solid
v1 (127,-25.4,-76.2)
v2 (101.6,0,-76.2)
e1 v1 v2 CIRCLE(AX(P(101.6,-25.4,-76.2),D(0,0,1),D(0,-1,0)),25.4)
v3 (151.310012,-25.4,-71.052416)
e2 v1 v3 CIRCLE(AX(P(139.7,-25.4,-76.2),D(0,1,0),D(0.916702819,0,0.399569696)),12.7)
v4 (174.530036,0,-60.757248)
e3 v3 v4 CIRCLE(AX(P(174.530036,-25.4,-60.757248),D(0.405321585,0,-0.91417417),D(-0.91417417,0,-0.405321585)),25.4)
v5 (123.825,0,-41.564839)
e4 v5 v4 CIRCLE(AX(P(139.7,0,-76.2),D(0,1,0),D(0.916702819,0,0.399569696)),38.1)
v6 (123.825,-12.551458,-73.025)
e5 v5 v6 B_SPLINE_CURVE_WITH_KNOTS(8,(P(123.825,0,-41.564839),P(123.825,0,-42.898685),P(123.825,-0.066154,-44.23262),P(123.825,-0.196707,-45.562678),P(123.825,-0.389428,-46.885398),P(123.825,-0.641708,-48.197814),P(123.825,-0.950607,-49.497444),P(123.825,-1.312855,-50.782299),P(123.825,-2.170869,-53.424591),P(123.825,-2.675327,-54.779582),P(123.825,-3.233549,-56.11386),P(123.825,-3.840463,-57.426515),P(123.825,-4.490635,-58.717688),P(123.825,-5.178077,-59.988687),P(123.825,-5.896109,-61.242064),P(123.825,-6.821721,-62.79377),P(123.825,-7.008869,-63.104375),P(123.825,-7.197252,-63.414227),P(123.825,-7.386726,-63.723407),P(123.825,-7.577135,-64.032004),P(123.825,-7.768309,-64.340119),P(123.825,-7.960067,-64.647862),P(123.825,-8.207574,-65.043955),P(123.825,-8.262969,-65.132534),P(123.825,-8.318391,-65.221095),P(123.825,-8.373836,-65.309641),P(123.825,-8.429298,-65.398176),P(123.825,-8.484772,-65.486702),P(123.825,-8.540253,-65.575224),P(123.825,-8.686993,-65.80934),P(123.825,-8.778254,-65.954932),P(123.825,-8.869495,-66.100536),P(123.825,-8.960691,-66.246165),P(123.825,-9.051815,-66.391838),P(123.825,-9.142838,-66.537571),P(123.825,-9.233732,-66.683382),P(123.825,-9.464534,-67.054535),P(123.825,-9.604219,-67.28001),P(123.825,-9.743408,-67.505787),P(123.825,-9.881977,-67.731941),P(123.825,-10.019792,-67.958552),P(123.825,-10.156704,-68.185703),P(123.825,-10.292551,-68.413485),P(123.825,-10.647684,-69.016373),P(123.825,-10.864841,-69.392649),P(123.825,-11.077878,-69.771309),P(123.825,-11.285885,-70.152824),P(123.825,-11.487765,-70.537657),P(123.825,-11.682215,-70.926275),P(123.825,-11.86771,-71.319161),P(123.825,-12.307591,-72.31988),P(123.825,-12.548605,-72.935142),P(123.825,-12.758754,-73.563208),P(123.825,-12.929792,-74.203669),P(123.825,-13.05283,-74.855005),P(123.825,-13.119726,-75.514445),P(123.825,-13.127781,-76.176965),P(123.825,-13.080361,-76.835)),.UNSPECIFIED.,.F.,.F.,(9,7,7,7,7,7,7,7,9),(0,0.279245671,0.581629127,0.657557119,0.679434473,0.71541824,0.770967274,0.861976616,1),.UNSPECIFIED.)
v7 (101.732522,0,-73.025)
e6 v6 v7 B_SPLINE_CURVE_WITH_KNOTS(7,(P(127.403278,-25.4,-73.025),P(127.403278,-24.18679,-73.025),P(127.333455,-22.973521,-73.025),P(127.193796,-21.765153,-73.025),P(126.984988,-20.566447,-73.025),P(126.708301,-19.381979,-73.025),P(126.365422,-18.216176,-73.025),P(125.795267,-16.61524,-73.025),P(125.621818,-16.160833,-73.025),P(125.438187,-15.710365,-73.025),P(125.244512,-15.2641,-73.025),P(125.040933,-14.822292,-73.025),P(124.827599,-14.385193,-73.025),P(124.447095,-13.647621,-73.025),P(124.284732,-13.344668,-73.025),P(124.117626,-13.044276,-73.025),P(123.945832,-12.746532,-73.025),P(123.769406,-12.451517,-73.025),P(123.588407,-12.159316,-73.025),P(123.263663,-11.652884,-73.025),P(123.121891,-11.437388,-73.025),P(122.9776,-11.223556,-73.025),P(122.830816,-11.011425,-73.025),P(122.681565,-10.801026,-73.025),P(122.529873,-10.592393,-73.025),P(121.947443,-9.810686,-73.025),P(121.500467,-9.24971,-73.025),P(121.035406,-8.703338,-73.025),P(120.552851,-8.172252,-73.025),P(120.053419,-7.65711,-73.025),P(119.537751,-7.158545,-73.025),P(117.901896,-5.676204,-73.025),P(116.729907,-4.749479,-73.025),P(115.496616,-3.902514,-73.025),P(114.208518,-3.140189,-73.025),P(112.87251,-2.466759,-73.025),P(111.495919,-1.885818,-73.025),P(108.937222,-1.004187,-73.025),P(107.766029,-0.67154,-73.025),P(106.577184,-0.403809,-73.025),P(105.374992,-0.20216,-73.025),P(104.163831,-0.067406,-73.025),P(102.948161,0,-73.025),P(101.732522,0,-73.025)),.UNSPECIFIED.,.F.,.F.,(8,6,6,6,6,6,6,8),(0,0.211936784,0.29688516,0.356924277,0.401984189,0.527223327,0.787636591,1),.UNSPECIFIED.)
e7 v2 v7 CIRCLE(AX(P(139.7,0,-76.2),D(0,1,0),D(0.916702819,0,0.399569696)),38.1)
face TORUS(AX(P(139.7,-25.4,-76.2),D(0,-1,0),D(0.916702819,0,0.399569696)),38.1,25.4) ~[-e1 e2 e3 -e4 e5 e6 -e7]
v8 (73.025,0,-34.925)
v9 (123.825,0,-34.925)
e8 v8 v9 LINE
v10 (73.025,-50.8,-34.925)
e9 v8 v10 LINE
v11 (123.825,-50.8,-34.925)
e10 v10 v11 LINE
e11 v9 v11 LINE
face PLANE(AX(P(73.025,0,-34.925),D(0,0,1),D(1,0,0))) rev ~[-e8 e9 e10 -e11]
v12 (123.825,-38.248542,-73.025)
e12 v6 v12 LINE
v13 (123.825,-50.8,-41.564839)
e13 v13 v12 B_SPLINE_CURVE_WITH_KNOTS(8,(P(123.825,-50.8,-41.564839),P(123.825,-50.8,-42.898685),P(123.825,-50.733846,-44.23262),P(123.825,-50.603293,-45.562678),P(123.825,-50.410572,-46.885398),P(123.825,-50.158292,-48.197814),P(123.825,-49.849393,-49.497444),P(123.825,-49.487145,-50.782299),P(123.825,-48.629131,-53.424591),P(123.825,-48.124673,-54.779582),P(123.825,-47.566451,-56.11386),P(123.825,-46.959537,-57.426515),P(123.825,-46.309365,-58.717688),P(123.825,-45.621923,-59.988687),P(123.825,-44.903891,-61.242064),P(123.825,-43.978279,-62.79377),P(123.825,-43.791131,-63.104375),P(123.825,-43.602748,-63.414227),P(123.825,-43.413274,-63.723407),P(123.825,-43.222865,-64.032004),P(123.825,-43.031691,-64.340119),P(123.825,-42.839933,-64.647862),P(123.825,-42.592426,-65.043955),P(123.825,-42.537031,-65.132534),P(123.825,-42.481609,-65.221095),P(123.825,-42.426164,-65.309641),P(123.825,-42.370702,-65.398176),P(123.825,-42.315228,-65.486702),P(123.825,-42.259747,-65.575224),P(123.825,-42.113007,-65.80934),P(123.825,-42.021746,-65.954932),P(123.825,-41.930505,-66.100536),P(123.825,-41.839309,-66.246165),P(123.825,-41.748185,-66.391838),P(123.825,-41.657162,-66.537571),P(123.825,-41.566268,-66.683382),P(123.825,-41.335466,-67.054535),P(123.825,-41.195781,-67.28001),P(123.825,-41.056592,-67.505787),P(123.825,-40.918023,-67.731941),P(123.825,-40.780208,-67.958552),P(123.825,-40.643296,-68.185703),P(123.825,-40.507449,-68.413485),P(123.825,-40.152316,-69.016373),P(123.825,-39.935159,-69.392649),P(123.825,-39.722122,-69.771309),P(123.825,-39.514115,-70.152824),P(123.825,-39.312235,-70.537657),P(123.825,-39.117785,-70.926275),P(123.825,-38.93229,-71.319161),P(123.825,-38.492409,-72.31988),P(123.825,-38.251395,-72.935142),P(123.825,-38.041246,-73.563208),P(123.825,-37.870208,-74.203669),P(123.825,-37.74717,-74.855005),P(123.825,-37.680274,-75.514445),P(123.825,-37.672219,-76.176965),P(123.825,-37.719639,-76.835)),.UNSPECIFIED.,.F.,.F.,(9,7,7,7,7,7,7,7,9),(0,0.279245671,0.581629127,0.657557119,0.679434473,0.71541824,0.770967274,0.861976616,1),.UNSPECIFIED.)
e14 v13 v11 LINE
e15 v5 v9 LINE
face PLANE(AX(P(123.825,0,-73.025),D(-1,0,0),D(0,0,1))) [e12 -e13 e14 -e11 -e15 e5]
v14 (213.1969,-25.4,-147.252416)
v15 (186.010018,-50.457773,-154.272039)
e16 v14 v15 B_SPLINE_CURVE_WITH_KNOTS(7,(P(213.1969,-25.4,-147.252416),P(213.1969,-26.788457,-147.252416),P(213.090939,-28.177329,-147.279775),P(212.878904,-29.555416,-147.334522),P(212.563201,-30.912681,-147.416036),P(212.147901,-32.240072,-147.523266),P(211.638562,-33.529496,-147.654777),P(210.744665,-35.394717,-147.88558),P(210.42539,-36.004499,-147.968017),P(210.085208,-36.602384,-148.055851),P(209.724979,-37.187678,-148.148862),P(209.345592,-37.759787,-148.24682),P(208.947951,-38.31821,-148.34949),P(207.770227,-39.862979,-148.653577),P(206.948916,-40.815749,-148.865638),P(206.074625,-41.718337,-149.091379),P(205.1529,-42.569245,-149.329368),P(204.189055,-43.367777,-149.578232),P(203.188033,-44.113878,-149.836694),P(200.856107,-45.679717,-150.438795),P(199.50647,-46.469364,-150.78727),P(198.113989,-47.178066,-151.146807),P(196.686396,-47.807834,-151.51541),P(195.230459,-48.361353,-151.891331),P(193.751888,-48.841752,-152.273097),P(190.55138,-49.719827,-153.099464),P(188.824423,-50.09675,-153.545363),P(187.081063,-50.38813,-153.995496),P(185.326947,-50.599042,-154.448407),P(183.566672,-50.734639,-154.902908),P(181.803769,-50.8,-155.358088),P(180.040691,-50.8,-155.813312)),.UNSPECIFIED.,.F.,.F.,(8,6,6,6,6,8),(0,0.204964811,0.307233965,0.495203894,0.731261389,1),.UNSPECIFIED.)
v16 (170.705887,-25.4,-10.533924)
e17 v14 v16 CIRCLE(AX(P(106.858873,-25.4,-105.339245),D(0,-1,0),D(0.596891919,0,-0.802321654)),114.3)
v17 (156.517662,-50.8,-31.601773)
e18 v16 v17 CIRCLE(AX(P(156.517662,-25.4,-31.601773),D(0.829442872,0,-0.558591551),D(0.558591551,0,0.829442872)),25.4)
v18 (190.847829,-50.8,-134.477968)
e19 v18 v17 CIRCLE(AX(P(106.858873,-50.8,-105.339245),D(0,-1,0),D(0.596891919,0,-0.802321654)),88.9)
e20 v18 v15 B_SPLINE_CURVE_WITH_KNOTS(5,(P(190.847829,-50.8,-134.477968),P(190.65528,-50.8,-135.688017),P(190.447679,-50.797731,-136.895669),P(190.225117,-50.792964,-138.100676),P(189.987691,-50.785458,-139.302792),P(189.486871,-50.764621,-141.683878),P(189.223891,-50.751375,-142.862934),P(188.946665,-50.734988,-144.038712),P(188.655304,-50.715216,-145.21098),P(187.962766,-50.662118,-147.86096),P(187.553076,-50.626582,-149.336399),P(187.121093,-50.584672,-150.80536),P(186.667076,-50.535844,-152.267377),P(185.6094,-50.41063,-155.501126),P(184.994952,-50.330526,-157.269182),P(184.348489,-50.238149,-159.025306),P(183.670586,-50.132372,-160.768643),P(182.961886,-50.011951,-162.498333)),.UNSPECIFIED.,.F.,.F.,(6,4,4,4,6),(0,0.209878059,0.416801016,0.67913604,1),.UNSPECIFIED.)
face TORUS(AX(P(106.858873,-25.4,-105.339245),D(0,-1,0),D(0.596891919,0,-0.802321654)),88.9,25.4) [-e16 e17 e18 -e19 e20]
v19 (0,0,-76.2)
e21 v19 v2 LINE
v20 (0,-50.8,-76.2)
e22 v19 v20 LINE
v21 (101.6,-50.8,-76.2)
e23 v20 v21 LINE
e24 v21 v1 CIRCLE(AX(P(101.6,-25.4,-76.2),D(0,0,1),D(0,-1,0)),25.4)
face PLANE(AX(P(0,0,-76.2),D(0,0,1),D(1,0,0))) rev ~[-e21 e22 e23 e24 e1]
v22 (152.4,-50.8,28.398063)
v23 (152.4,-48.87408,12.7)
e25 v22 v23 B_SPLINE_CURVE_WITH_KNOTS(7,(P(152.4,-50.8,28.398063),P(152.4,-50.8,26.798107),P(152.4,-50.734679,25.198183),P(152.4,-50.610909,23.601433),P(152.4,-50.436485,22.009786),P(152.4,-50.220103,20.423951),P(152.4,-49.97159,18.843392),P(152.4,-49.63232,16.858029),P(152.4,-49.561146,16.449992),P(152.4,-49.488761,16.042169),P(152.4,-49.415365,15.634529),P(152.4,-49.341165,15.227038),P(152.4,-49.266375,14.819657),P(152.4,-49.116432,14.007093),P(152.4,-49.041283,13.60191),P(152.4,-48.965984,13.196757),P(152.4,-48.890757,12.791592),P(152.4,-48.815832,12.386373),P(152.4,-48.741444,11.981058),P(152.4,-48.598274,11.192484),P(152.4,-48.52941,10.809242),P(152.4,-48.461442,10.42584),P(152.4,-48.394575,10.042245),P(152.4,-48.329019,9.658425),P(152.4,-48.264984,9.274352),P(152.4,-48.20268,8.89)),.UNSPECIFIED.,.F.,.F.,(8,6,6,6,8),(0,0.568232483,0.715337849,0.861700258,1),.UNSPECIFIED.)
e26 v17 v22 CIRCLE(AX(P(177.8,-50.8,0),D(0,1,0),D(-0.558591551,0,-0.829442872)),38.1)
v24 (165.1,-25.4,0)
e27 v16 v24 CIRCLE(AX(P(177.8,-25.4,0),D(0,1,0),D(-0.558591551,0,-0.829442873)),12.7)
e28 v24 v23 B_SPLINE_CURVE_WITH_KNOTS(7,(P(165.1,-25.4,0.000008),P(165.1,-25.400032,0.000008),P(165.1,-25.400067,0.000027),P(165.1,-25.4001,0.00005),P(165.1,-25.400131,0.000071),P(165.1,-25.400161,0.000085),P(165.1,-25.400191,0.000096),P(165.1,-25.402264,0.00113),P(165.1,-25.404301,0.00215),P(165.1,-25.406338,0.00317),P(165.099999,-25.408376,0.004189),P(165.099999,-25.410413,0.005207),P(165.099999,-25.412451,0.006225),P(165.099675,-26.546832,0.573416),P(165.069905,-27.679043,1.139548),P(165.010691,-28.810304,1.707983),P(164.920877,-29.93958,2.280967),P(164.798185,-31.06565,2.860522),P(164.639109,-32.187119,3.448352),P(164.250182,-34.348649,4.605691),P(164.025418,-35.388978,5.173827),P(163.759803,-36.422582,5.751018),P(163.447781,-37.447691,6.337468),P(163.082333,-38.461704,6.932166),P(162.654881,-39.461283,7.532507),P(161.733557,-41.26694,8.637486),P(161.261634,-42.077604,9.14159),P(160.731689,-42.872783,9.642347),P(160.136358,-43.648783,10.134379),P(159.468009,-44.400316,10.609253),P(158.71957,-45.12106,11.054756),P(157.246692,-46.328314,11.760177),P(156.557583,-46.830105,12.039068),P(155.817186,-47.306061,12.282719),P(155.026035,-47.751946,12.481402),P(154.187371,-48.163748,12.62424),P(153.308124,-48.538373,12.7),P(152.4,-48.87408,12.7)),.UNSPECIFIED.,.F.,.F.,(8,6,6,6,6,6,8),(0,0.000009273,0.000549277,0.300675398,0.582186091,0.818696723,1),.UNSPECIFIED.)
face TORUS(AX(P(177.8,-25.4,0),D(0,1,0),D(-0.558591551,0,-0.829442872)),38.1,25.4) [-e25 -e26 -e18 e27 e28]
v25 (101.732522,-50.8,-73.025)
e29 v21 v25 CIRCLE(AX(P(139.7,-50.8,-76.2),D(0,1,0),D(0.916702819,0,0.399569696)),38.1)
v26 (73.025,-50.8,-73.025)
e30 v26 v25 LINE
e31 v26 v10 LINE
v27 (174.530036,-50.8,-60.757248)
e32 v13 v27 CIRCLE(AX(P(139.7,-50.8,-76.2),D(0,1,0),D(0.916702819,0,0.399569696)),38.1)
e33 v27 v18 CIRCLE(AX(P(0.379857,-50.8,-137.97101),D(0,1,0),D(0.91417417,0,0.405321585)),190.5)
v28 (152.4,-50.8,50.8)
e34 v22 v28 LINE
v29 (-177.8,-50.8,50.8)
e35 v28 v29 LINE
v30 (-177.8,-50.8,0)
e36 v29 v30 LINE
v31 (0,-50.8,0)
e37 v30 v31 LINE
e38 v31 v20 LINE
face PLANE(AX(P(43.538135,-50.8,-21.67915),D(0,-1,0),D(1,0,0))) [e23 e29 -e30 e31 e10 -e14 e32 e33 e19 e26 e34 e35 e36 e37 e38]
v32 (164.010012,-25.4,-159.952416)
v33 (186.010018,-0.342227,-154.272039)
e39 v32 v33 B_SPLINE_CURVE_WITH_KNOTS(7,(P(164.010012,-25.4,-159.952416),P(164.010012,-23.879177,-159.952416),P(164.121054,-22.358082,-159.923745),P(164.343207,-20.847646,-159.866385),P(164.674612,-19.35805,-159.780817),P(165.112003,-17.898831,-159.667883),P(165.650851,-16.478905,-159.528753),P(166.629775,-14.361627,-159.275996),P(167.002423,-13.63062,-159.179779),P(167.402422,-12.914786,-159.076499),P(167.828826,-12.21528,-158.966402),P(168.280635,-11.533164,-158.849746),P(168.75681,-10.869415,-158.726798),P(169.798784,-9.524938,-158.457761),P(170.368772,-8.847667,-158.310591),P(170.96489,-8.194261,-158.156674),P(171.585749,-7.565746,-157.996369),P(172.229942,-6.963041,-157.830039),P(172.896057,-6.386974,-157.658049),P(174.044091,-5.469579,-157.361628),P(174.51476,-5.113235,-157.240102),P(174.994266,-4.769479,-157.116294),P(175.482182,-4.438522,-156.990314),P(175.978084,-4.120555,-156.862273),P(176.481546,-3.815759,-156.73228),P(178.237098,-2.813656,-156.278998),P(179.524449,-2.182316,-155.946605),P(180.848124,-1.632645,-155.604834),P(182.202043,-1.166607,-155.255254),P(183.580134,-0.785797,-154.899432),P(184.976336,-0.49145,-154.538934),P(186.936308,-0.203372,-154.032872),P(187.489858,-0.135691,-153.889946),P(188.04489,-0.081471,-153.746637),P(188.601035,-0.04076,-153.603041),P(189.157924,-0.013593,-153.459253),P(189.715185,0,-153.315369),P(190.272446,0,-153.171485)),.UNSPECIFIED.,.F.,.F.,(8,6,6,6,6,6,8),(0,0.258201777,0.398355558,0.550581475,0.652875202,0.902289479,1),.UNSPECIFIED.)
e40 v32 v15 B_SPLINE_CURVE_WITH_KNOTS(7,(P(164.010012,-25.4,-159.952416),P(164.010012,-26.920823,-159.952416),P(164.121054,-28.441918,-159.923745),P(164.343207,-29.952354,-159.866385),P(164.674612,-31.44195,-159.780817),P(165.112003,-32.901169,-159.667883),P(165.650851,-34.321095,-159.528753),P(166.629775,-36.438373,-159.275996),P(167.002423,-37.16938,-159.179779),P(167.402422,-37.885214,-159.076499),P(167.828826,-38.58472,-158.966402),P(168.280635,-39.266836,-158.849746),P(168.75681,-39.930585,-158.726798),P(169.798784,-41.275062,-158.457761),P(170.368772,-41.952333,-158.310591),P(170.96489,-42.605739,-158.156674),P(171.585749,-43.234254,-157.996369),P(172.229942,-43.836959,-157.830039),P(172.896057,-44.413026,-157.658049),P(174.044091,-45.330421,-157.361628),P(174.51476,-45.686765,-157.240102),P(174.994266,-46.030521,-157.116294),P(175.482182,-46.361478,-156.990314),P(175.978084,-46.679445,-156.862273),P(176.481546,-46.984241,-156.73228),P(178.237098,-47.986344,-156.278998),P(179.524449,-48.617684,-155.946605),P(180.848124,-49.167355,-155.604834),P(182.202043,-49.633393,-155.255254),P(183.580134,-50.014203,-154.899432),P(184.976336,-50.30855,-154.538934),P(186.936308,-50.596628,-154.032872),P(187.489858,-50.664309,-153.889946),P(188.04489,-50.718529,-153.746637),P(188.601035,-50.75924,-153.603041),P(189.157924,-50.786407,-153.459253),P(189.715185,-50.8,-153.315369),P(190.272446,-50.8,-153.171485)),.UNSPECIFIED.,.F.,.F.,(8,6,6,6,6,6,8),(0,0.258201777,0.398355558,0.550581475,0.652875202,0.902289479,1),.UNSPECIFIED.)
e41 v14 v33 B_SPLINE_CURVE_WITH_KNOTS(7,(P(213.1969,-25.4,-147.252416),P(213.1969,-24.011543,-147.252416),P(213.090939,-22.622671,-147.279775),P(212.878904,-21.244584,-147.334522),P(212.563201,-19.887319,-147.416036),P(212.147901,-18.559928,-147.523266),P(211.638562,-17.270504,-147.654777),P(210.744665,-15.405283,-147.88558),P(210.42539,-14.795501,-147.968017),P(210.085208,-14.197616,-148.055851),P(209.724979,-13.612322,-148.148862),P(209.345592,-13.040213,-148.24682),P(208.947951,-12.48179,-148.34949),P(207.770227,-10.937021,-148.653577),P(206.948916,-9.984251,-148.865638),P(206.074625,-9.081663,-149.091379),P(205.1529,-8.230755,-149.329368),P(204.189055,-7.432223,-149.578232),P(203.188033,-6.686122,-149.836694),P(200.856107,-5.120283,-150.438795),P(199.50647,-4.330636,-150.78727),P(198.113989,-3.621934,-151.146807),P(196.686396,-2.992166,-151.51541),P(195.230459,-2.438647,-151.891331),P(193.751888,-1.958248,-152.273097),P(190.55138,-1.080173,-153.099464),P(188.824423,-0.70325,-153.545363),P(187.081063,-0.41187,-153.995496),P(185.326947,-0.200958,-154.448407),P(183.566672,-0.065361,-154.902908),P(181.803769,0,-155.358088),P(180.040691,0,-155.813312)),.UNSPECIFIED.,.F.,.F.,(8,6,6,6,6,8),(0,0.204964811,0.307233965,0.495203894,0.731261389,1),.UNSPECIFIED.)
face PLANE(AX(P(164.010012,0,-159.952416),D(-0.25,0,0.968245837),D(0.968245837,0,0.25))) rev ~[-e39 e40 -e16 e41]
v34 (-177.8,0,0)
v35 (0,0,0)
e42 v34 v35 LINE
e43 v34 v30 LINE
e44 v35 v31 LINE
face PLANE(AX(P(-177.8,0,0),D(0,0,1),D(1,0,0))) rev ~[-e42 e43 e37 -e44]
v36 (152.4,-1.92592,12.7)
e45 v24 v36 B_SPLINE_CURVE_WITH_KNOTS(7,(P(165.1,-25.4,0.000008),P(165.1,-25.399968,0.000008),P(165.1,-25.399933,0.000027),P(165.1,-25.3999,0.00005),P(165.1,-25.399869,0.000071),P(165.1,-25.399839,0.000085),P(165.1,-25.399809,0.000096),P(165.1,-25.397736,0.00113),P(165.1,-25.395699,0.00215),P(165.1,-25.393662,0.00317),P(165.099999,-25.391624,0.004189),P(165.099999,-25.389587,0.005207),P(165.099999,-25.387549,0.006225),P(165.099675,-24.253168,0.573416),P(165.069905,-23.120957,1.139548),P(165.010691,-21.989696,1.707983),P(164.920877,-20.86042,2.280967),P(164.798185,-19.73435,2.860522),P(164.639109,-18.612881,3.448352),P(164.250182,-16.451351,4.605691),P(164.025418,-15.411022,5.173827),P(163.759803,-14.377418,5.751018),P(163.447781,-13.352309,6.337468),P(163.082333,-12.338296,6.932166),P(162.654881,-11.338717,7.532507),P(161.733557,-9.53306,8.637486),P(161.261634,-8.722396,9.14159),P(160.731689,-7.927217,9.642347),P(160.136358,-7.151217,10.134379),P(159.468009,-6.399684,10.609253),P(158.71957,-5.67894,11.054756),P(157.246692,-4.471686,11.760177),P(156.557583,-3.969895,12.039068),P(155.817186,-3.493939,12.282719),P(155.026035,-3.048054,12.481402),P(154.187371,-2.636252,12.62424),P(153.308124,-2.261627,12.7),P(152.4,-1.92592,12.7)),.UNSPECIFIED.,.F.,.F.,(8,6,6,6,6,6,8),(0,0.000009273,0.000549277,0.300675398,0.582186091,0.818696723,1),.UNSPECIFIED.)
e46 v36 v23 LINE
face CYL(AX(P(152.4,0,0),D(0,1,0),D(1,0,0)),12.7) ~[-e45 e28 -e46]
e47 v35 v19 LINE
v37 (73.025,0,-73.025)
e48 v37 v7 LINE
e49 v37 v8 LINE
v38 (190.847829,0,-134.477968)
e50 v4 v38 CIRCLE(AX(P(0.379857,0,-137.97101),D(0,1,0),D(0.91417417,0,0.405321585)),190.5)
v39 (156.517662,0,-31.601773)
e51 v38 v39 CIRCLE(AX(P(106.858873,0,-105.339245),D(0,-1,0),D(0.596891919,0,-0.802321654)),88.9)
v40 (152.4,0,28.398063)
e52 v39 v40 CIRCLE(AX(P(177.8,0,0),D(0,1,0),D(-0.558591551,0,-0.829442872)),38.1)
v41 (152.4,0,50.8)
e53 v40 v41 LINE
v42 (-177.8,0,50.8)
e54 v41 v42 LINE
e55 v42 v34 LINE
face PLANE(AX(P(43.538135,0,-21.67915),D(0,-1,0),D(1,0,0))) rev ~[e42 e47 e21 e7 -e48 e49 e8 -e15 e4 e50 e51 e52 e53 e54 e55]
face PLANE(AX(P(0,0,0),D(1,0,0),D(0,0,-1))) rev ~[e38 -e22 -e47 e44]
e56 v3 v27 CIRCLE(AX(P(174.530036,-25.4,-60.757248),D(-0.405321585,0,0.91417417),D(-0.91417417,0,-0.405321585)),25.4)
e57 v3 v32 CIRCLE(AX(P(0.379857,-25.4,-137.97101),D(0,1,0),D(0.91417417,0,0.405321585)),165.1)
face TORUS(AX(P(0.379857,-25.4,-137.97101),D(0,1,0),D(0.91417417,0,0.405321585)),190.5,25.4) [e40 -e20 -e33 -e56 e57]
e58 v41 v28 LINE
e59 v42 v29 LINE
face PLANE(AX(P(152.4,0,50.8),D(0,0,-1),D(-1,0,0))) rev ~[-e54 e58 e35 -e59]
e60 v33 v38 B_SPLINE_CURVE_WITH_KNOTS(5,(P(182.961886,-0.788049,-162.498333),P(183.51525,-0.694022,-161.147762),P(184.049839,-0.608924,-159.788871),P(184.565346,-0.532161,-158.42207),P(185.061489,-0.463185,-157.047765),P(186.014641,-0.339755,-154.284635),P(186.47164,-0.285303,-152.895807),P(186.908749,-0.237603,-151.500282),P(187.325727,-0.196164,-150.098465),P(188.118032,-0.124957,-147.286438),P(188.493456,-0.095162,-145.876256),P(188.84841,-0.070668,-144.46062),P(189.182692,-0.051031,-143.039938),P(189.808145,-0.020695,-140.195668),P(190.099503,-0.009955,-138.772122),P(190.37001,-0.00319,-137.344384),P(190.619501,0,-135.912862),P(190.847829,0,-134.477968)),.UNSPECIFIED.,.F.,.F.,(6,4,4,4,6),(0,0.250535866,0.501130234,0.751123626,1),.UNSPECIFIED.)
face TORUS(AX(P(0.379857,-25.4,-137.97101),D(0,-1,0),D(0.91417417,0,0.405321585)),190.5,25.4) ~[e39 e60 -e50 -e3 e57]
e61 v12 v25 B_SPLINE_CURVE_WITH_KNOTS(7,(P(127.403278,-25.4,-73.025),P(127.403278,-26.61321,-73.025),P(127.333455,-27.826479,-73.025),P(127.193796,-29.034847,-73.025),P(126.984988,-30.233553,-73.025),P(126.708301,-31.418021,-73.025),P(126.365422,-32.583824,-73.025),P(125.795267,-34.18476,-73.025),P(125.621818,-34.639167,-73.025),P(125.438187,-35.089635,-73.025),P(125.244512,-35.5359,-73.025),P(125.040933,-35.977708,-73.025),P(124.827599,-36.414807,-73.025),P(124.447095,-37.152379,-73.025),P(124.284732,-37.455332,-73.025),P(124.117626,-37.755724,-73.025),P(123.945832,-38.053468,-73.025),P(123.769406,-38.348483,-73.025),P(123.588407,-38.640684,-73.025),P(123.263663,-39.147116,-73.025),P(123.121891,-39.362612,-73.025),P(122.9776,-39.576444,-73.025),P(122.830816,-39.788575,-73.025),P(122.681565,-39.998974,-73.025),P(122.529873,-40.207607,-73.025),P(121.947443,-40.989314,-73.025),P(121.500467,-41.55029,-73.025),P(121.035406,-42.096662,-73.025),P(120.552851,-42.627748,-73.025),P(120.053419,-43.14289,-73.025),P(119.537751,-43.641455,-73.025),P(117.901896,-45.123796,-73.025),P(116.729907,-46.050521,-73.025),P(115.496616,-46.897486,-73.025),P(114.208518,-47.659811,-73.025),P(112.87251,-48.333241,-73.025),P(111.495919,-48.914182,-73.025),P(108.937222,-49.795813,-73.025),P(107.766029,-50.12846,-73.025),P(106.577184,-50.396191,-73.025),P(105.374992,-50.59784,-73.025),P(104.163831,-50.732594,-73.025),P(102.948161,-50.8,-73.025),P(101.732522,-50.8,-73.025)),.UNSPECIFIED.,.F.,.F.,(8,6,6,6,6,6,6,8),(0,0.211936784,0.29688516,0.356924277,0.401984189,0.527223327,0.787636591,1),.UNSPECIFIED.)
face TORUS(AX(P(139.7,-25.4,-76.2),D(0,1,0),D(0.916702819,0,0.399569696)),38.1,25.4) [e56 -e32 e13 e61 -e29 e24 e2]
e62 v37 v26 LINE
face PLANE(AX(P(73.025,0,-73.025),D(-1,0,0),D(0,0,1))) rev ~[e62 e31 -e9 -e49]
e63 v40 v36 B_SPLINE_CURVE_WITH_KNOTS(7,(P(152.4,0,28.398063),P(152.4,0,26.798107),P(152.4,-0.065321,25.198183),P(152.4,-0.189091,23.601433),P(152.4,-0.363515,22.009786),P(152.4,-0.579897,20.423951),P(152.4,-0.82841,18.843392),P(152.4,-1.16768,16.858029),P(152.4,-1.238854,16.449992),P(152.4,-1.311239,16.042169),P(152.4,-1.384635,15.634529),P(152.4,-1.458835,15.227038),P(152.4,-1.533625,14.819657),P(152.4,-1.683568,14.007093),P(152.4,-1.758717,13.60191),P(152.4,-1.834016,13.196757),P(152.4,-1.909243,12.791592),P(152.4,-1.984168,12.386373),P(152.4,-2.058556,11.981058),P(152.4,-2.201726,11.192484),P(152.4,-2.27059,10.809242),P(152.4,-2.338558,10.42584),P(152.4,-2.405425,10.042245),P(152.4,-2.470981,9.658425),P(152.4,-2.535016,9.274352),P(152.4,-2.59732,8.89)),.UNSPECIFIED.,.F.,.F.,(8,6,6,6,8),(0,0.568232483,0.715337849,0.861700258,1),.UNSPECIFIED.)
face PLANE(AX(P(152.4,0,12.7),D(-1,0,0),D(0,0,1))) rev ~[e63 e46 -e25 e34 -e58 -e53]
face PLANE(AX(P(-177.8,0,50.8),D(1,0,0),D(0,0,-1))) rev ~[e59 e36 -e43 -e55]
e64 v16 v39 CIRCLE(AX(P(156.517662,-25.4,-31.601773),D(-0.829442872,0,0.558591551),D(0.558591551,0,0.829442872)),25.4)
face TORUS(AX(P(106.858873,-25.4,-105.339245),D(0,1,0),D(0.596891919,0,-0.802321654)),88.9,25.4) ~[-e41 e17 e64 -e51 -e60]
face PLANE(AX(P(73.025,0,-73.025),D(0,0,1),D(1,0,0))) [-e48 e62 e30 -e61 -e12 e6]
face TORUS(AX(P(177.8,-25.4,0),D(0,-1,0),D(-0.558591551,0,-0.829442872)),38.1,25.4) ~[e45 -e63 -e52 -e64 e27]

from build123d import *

# Parameters (mm, degrees)
F0_W         = 50.8
F0_H         = 38.1
F1_DEPTH     = 50.8
F2_T2_ANGLE  = 53.6002837339
F2_T4_ANGLE  = 53.6002837339
F2_T6_ANGLE  = 109.3939294159
F2_T8_ANGLE  = 109.3939294159
F2_T10_ANGLE = 342.5650608066
F2_T12_ANGLE = 342.5650608066
F2_T14_ANGLE = 359.64
F2_T16_ANGLE = 359.64


# Not quite as in the source:
# - a fillet or chamfer that OpenCascade refuses, or shapes differently, is made with other operations: its cross-section is extruded or revolved along the edge and cut away or added


with BuildPart() as f1:
    # F0 (on Front) → F1 (new body)
    with BuildSketch(Plane.XZ):
        with BuildLine():
            Line((-177.8, 0), (0, 0))
            Line((0, 0), (0, -76.2))
            Line((0, -76.2), (127, -76.2))
            ThreePointArc((127, -76.2), (137.069140052, -63.7754848813), (151.3100119581, -71.0524158741))
            ThreePointArc((151.3100119581, -71.0524158741), (163.8205179064, -114.6223435958), (164.0100119581, -159.9524158741))
            Line((164.0100119581, -159.9524158741), (213.1969004549, -147.2524158741))
            ThreePointArc((213.1969004549, -147.2524158741), (216.0088779453, -71.4162966266), (170.7058872965, -10.53392448))
            ThreePointArc((170.7058872965, -10.53392448), (166.5887281869, -5.9663543586), (165.1, 0))
            ThreePointArc((165.1, 0), (161.3802561211, 8.9802561211), (152.4, 12.7))
            Line((152.4, 12.7), (152.4, 50.8))
            Line((152.4, 50.8), (-177.8, 50.8))
            Line((-177.8, 50.8), (-177.8, 0))
        make_face()
        with Locations((98.425, -53.975)):
            Rectangle(F0_W, F0_H, mode=Mode.SUBTRACT)
    extrude(amount=F1_DEPTH)

    # F2: fillet of radius 25.4 on 8 edges, made by hand

    # F2_s1 → F2_t2 (revolve, cut)
    with BuildSketch(Plane(origin=(51.1854271814, 0, -115.4451111674), x_dir=(0, 1, 0), z_dir=(-0.4053215847, 0, 0.9141741699))):
        with BuildLine():
            ThreePointArc((-25.4, -109.5246267837), (-43.3605122421, -116.9641145416), (-50.8, -134.9246267837))
            Line((-50.8, -134.9246267837), (-50.8, -109.5246267837))
            Line((-50.8, -109.5246267837), (-25.4, -109.5246267837))
        make_face()
    revolve(axis=Axis((0.3798565029, -50.8, -137.9710095106), (0, 1, 0)), revolution_arc=F2_T2_ANGLE, mode=Mode.SUBTRACT)

    # F2_s3 → F2_t4 (revolve, cut)
    with BuildSketch(Plane(origin=(51.1854271814, 0, -115.4451111674), x_dir=(0, 1, 0), z_dir=(-0.4053215847, 0, 0.9141741699))):
        with BuildLine():
            ThreePointArc((-25.4, -109.5246267837), (-7.4394877579, -116.9641145416), (0, -134.9246267837))
            Line((0, -134.9246267837), (0, -109.5246267837))
            Line((0, -109.5246267837), (-25.4, -109.5246267837))
        make_face()
    revolve(axis=Axis((0.3798565029, 0, -137.9710095106), (0, 1, 0)), revolution_arc=F2_T4_ANGLE, mode=Mode.SUBTRACT)

    # F2_s5 → F2_t6 (revolve, cut)
    with BuildSketch(Plane(origin=(18.3403057366, 0, 13.6443784603), x_dir=(0, 1, 0), z_dir=(-0.802321654, 0, -0.5968919194))):
        with BuildLine():
            ThreePointArc((-25.4, 262.599154914), (-43.3605122421, 255.1596671561), (-50.8, 237.199154914))
            Line((-50.8, 237.199154914), (-50.8, 262.599154914))
            Line((-50.8, 262.599154914), (-25.4, 262.599154914))
        make_face()
    revolve(axis=Axis((106.8588729648, -50.8, -105.3392447997), (0, -1, 0)), revolution_arc=F2_T6_ANGLE, mode=Mode.SUBTRACT)

    # F2_s7 → F2_t8 (revolve, cut)
    with BuildSketch(Plane(origin=(18.3403057366, 0, 13.6443784603), x_dir=(0, 1, 0), z_dir=(-0.802321654, 0, -0.5968919194))):
        with BuildLine():
            ThreePointArc((-25.4, 262.599154914), (-7.4394877579, 255.1596671561), (0, 237.199154914))
            Line((0, 237.199154914), (0, 262.599154914))
            Line((0, 262.599154914), (-25.4, 262.599154914))
        make_face()
    revolve(axis=Axis((106.8588729648, 0, -105.3392447997), (0, -1, 0)), revolution_arc=F2_T8_ANGLE, mode=Mode.SUBTRACT)

    # F2_s9 → F2_t10 (revolve, cut)
    with BuildSketch(Plane(origin=(122.3220401021, 0, -82.378257055), x_dir=(0, 1, 0), z_dir=(0.8294428724, 0, -0.5585915515))):
        with BuildLine():
            ThreePointArc((-25.4, 86.6175778493), (-7.4394877579, 79.1780900914), (0, 61.2175778493))
            Line((0, 61.2175778493), (0, 86.6175778493))
            Line((0, 86.6175778493), (-25.4, 86.6175778493))
        make_face()
    revolve(axis=Axis((177.8, 0, 0), (0, 1, 0)), revolution_arc=F2_T10_ANGLE, mode=Mode.SUBTRACT)

    # F2_s11 → F2_t12 (revolve, cut)
    with BuildSketch(Plane(origin=(122.3220401021, 0, -82.378257055), x_dir=(0, 1, 0), z_dir=(0.8294428724, 0, -0.5585915515))):
        with BuildLine():
            ThreePointArc((-25.4, 86.6175778493), (-43.3605122421, 79.1780900914), (-50.8, 61.2175778493))
            Line((-50.8, 61.2175778493), (-50.8, 86.6175778493))
            Line((-50.8, 86.6175778493), (-25.4, 86.6175778493))
        make_face()
    revolve(axis=Axis((177.8, -50.8, 0), (0, 1, 0)), revolution_arc=F2_T12_ANGLE, mode=Mode.SUBTRACT)

    # F2_s13 → F2_t14 (revolve, cut)
    with BuildSketch(Plane(origin=(50.2149791059, 0, -115.2044645561), x_dir=(0, 1, 0), z_dir=(-0.3995696961, 0, 0.9167028188))):
        with BuildLine():
            ThreePointArc((-25.4, -110.3161729414), (-7.4394877579, -117.7556606993), (0, -135.7161729414))
            Line((0, -135.7161729414), (0, -110.3161729414))
            Line((0, -110.3161729414), (-25.4, -110.3161729414))
        make_face()
    revolve(axis=Axis((139.7, 0, -76.2), (0, 1, 0)), revolution_arc=F2_T14_ANGLE, mode=Mode.SUBTRACT)

    # F2_s15 → F2_t16 (revolve, cut)
    with BuildSketch(Plane(origin=(50.2149791059, 0, -115.2044645561), x_dir=(0, 1, 0), z_dir=(-0.3995696961, 0, 0.9167028188))):
        with BuildLine():
            ThreePointArc((-25.4, -110.3161729414), (-43.3605122421, -117.7556606993), (-50.8, -135.7161729414))
            Line((-50.8, -135.7161729414), (-50.8, -110.3161729414))
            Line((-50.8, -110.3161729414), (-25.4, -110.3161729414))
        make_face()
    revolve(axis=Axis((139.7, -50.8, -76.2), (0, 1, 0)), revolution_arc=F2_T16_ANGLE, mode=Mode.SUBTRACT)


solid = f1.part
